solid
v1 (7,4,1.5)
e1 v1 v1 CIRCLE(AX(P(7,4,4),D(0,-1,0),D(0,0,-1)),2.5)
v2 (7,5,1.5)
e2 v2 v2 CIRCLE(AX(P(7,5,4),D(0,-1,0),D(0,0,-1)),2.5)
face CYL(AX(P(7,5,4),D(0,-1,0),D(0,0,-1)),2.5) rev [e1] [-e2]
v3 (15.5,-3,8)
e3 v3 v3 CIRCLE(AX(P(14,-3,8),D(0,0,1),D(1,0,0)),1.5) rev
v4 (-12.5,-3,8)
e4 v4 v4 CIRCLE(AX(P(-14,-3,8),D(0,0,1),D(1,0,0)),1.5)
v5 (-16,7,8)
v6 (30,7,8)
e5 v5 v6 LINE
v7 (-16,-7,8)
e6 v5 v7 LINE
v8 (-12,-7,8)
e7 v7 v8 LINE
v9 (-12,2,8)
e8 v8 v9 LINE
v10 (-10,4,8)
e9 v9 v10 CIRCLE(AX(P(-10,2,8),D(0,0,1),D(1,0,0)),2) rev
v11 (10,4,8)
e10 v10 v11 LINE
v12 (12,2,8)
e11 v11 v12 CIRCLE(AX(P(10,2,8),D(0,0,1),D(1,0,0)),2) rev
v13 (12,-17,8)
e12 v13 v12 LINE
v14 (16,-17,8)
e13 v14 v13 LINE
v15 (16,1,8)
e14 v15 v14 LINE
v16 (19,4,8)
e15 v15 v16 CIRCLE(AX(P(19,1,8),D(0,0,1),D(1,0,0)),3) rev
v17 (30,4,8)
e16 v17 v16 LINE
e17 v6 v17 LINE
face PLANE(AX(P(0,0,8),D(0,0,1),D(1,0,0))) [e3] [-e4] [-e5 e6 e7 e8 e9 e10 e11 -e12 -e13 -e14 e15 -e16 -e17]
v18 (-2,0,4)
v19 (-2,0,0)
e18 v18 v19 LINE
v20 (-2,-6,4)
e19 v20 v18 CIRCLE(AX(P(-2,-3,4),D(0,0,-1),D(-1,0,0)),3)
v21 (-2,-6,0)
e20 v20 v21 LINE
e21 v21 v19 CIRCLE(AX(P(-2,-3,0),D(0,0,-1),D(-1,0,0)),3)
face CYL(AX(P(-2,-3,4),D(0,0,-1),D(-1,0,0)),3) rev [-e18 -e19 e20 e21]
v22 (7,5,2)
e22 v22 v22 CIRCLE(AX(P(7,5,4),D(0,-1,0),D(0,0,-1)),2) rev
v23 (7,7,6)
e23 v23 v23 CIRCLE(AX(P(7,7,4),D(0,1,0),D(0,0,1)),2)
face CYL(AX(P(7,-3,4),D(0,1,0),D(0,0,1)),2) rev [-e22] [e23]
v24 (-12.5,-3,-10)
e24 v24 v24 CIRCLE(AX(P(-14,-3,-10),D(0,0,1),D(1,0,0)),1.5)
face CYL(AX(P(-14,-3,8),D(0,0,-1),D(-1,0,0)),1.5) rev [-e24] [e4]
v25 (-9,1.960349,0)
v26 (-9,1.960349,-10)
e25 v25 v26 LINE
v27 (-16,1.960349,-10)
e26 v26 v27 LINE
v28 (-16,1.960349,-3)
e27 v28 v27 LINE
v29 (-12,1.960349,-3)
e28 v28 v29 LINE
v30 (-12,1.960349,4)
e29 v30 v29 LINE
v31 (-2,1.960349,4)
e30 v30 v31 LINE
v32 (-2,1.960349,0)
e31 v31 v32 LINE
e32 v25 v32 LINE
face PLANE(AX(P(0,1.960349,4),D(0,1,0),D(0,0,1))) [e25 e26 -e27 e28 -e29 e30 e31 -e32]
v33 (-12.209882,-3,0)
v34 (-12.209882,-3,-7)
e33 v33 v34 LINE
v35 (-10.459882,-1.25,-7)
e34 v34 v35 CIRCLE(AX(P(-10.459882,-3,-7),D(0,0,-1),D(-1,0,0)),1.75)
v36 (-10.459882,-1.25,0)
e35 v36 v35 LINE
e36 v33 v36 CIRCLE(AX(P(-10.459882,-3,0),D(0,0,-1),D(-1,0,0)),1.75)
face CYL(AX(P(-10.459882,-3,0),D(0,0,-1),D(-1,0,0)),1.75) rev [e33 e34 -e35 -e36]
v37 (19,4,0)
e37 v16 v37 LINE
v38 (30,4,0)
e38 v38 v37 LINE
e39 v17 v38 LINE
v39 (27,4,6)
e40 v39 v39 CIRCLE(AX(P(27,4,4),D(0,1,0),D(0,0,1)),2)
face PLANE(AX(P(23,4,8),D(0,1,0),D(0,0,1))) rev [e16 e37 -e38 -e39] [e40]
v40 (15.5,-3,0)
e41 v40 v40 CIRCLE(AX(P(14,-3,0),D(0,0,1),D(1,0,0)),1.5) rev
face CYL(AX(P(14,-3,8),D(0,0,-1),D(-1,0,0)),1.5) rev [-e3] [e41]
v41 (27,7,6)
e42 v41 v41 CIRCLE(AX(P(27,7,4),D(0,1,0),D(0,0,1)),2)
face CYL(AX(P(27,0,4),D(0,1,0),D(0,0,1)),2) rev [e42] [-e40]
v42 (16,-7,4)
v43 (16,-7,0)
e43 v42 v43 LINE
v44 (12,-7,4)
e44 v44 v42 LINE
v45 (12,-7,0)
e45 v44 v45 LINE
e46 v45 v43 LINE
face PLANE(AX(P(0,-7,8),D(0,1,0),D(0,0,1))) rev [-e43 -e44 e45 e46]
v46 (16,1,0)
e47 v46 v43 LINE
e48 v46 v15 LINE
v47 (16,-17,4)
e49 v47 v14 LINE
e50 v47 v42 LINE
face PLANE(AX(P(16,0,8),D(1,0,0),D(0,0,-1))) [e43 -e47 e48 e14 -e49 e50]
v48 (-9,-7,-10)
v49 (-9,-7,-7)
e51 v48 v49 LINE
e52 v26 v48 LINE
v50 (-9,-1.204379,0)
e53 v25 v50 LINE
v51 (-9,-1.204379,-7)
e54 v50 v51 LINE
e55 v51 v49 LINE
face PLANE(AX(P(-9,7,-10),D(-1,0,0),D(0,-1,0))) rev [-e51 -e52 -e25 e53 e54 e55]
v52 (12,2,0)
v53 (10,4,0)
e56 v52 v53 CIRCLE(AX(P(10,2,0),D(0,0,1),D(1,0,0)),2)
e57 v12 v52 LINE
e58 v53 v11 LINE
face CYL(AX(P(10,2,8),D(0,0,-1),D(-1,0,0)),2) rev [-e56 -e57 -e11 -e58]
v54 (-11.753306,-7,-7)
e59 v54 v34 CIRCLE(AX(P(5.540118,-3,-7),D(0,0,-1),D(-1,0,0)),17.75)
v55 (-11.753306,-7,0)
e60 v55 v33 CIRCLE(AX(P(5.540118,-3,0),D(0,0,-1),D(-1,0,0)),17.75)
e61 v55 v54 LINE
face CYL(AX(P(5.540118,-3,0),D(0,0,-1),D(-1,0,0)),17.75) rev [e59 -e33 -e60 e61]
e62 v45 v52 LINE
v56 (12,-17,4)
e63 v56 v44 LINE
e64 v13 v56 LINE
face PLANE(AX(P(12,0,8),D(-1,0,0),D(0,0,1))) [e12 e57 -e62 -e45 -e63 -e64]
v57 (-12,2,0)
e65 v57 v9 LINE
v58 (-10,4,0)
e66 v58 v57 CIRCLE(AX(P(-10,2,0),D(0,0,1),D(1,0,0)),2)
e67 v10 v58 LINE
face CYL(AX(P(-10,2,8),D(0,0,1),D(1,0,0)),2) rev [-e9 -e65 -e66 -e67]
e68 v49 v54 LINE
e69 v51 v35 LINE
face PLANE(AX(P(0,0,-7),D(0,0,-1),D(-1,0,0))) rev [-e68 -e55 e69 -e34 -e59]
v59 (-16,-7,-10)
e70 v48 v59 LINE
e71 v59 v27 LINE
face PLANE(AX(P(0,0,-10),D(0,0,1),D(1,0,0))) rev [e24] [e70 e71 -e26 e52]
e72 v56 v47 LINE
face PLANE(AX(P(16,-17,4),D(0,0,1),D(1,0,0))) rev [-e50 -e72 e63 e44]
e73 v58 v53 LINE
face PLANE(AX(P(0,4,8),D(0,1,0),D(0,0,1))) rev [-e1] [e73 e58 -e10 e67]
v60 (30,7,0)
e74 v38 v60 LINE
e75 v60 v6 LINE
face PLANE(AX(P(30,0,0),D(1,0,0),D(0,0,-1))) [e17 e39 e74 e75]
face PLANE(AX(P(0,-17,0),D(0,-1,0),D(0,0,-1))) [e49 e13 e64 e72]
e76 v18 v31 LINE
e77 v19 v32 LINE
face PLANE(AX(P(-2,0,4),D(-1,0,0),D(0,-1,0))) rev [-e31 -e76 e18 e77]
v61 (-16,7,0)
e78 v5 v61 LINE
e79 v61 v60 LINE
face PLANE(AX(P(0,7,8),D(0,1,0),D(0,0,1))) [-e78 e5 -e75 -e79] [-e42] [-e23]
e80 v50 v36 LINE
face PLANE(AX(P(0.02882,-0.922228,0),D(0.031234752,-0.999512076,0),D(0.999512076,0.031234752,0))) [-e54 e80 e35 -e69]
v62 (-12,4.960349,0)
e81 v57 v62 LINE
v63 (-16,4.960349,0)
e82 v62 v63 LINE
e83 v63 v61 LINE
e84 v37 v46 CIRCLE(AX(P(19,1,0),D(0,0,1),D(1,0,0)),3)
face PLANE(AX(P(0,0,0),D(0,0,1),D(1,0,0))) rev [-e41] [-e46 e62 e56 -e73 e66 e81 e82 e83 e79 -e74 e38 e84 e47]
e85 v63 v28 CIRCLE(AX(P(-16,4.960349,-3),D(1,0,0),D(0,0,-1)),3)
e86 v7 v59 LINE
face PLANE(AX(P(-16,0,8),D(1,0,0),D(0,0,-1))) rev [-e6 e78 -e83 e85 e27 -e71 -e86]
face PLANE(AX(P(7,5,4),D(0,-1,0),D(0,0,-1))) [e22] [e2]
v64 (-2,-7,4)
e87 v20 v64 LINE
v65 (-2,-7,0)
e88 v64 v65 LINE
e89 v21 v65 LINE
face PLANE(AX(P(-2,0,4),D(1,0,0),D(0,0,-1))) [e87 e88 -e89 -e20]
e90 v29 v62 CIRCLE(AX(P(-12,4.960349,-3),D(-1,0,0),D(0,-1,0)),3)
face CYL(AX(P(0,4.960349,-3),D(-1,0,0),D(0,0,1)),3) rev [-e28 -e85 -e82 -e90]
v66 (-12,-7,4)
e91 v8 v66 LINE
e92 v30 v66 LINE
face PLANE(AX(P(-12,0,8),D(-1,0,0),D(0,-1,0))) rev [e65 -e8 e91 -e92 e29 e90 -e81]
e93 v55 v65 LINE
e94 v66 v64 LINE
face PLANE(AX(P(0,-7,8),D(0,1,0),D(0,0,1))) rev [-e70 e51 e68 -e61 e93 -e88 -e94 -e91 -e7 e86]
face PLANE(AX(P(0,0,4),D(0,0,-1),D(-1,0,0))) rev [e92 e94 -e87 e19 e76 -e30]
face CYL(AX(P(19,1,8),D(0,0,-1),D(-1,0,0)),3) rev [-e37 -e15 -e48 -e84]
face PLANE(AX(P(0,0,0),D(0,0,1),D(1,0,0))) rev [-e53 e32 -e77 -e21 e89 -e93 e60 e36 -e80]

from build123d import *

# Parameters (mm, degrees)
SKETCH_1_R          = 1.5
EXTRUDE_1_DEPTH     = 8
EXTRUDE_2_DEPTH     = 4
SKETCH_4_W          = 7
SKETCH_4_H          = 14
EXTRUDE_3_DEPTH     = 10
CUT_EXTRUDE_START   = -3
CUT_EXTRUDE_1_DEPTH = 7
SKETCH_6_W          = 7
SKETCH_6_H          = 5.039650546
CUT_EXTRUDE_3_DEPTH = 10
CUT_EXTRUDE_START_2 = -10
SKETCH_7_R          = 1.5
CUT_EXTRUDE_4_DEPTH = 10
SKETCH_9_W          = 8
SKETCH_9_H          = 3
EXTRUDE_4_DEPTH     = 7
FILLET_3_R          = 3
FILLET_4_R          = 2
SKETCH_10_W         = 4
SKETCH_10_H         = 4
EXTRUDE_5_DEPTH     = 10
SKETCH_8_R          = 2
CUT_EXTRUDE_6_DEPTH = 10
SKETCH_13_R         = 2.5
CUT_EXTRUDE_7_DEPTH = 1
SKETCH_14_W         = 8
SKETCH_14_H         = 3
EXTRUDE_6_DEPTH     = 7
FILLET_5_R          = 2
SKETCH_15_R         = 2
CUT_EXTRUDE_8_DEPTH = 7


with BuildPart() as part:
    # 草图1 → 凸台-拉伸1 (new body)
    with BuildSketch(Plane.XY):
        Polygon((16, 7), (-16, 7), (-16, -7), (-12, -7), (-12, 4), (12, 4), (12, -7), (16, -7), align=None)
        with Locations((-14, -3)):
            Circle(SKETCH_1_R, mode=Mode.SUBTRACT)
        with Locations((14, -3)):
            Circle(SKETCH_1_R, mode=Mode.SUBTRACT)
    extrude(amount=EXTRUDE_1_DEPTH)

    # 草图3 → 凸台-拉伸2 (add)
    with BuildSketch(Plane(origin=(0, 0, 0), x_dir=(-1, 0, 0), z_dir=(0, 0, -1))):
        with BuildLine():
            Line((2, -7), (12, -7))
            Line((12, -7), (12, 1.960349454))
            Line((12, 1.960349454), (2, 1.960349454))
            Line((2, 1.960349454), (2, 0))
            ThreePointArc((2, 0), (4.121320344, -0.878679656), (5, -3))
            ThreePointArc((5, -3), (4.121320344, -5.121320344), (2, -6))
            Line((2, -6), (2, -7))
        make_face()
    extrude(amount=-EXTRUDE_2_DEPTH)

    # 草图4 → 凸台-拉伸3 (add)
    with BuildSketch(Plane(origin=(0, 0, 0), x_dir=(-1, 0, 0), z_dir=(0, 0, -1))):
        with Locations((12.5, 0)):
            Rectangle(SKETCH_4_W, SKETCH_4_H)
    extrude(amount=EXTRUDE_3_DEPTH)

    # 草图5 → 切除-拉伸1 (cut)
    with BuildSketch(Plane(origin=(0, 0, -10), x_dir=(-1, 0, 0), z_dir=(0, 0, -1)).offset(CUT_EXTRUDE_START)):
        with BuildLine():
            ThreePointArc((12.209881979, -3), (11.697318846, -1.762563133), (10.459881979, -1.25))
            ThreePointArc((10.459881979, -1.25), (9.631108119, -1.458690852), (9, -2.034989841))
            Line((9, -2.034989841), (9, -3.965010159))
            ThreePointArc((9, -3.965010159), (10.963720513, -4.675901767), (12.209881979, -3))
        make_face()
        with BuildLine():
            Line((9, -3.965010159), (9, -2.034989841))
            ThreePointArc((9, -2.034989841), (8.709881979, -3), (9, -3.965010159))
        make_face()
        with BuildLine():
            ThreePointArc((11.753305584, -7), (12.095368491, -5.012986712), (12.209881979, -3))
            ThreePointArc((12.209881979, -3), (10.963720513, -4.675901767), (9, -3.965010159))
            Line((9, -3.965010159), (9, -7))
            Line((9, -7), (11.753305584, -7))
        make_face()
        with BuildLine():
            Line((10.459881979, -1.25), (9, -1.204378688))
            Line((9, -1.204378688), (9, -2.034989841))
            ThreePointArc((9, -2.034989841), (9.631108119, -1.458690852), (10.459881979, -1.25))
        make_face()
    extrude(amount=-CUT_EXTRUDE_1_DEPTH, mode=Mode.SUBTRACT)

    # 草图6 → 切除-拉伸3 (cut)
    with BuildSketch(Plane(origin=(0, 0, -10), x_dir=(-1, 0, 0), z_dir=(0, 0, -1))):
        with Locations((12.5, 4.480174727)):
            Rectangle(SKETCH_6_W, SKETCH_6_H)
    extrude(amount=-CUT_EXTRUDE_3_DEPTH, mode=Mode.SUBTRACT)

    # 草图7 → 切除-拉伸4 (cut)
    with BuildSketch(Plane.XY.offset(CUT_EXTRUDE_START_2)):
        with Locations((-14, -3)):
            Circle(SKETCH_7_R)
    extrude(amount=CUT_EXTRUDE_4_DEPTH, mode=Mode.SUBTRACT)

    # 草图9 → 凸台-拉伸4 (add)
    with BuildSketch(Plane(origin=(16, 0, 0), x_dir=(0, 0, -1), z_dir=(1, 0, 0))):
        with Locations((-4, 5.5)):
            Rectangle(SKETCH_9_W, SKETCH_9_H)
    extrude(amount=EXTRUDE_4_DEPTH)

    # 圆角3
    # the kernel refuses this fillet: 3 mm, written as the material it adds along each edge
    with BuildSketch(Plane(origin=(-16, 1.960349454, 0), x_dir=(0, 0, -1), z_dir=(1, 0, 0))) as fillet_3_piece_1:
        with BuildLine():
            CenterArc((FILLET_3_R, FILLET_3_R), FILLET_3_R, 180, 90)
            Line((0, FILLET_3_R), (0, 0))
            Line((0, 0), (FILLET_3_R, 0))
        make_face()
    extrude(amount=4)
    with BuildSketch(Plane(origin=(16, 4, 0), x_dir=(1, 0, 0), z_dir=(0, 0, 1))) as fillet_3_piece_2:
        with BuildLine():
            CenterArc((FILLET_3_R, -FILLET_3_R), FILLET_3_R, 90, 90)
            Line((0, -FILLET_3_R), (0, 0))
            Line((0, 0), (FILLET_3_R, 0))
        make_face()
    extrude(amount=8)

    # 圆角4
    fillet_4_edges = [part.edges().sort_by_distance(p)[0] for p in [
        (-12, 4, 4),
    ]]
    fillet(fillet_4_edges, radius=FILLET_4_R)

    # 草图10 → 凸台-拉伸5 (add)
    with BuildSketch(Plane.XZ.offset(7)):
        with Locations((14, 6)):
            Rectangle(SKETCH_10_W, SKETCH_10_H)
    extrude(amount=EXTRUDE_5_DEPTH)

    # 草图8 → 切除-拉伸6 (cut)
    with BuildSketch(Plane(origin=(0, 7, 0), x_dir=(1, 0, 0), z_dir=(0, 1, 0))):
        with Locations(Location((7, -4, 0), (0, 0, 270))):
            Circle(SKETCH_8_R)
        with Locations((27, -4)):
            Circle(SKETCH_8_R)
    extrude(amount=-CUT_EXTRUDE_6_DEPTH, mode=Mode.SUBTRACT)

    # 草图13 → 切除-拉伸7 (cut)
    with BuildSketch(Plane.XZ.offset(-4)):
        with Locations(Location((7, 4, 0), (0, 0, 270))):
            Circle(SKETCH_13_R)
    extrude(amount=-CUT_EXTRUDE_7_DEPTH, mode=Mode.SUBTRACT)

    # 草图14 → 凸台-拉伸6 (add)
    with BuildSketch(Plane(origin=(23, 0, 0), x_dir=(0, 0, -1), z_dir=(1, 0, 0))):
        with Locations((-4, 5.5)):
            Rectangle(SKETCH_14_W, SKETCH_14_H)
    extrude(amount=EXTRUDE_6_DEPTH)

    # 圆角5
    fillet_5_edges = [part.edges().sort_by_distance(p)[0] for p in [
        (12, 4, 4),
    ]]
    fillet(fillet_5_edges, radius=FILLET_5_R)

    # 草图15 → 切除-拉伸8 (cut)
    with BuildSketch(Plane(origin=(0, 7, 0), x_dir=(1, 0, 0), z_dir=(0, 1, 0))):
        with Locations(Location((27, -4, 0), (0, 0, 270))):
            Circle(SKETCH_15_R)
        with Locations(Location((7, -4, 0), (0, 0, 270))):
            Circle(SKETCH_15_R)
    extrude(amount=-CUT_EXTRUDE_8_DEPTH, mode=Mode.SUBTRACT)


solid = part.part
